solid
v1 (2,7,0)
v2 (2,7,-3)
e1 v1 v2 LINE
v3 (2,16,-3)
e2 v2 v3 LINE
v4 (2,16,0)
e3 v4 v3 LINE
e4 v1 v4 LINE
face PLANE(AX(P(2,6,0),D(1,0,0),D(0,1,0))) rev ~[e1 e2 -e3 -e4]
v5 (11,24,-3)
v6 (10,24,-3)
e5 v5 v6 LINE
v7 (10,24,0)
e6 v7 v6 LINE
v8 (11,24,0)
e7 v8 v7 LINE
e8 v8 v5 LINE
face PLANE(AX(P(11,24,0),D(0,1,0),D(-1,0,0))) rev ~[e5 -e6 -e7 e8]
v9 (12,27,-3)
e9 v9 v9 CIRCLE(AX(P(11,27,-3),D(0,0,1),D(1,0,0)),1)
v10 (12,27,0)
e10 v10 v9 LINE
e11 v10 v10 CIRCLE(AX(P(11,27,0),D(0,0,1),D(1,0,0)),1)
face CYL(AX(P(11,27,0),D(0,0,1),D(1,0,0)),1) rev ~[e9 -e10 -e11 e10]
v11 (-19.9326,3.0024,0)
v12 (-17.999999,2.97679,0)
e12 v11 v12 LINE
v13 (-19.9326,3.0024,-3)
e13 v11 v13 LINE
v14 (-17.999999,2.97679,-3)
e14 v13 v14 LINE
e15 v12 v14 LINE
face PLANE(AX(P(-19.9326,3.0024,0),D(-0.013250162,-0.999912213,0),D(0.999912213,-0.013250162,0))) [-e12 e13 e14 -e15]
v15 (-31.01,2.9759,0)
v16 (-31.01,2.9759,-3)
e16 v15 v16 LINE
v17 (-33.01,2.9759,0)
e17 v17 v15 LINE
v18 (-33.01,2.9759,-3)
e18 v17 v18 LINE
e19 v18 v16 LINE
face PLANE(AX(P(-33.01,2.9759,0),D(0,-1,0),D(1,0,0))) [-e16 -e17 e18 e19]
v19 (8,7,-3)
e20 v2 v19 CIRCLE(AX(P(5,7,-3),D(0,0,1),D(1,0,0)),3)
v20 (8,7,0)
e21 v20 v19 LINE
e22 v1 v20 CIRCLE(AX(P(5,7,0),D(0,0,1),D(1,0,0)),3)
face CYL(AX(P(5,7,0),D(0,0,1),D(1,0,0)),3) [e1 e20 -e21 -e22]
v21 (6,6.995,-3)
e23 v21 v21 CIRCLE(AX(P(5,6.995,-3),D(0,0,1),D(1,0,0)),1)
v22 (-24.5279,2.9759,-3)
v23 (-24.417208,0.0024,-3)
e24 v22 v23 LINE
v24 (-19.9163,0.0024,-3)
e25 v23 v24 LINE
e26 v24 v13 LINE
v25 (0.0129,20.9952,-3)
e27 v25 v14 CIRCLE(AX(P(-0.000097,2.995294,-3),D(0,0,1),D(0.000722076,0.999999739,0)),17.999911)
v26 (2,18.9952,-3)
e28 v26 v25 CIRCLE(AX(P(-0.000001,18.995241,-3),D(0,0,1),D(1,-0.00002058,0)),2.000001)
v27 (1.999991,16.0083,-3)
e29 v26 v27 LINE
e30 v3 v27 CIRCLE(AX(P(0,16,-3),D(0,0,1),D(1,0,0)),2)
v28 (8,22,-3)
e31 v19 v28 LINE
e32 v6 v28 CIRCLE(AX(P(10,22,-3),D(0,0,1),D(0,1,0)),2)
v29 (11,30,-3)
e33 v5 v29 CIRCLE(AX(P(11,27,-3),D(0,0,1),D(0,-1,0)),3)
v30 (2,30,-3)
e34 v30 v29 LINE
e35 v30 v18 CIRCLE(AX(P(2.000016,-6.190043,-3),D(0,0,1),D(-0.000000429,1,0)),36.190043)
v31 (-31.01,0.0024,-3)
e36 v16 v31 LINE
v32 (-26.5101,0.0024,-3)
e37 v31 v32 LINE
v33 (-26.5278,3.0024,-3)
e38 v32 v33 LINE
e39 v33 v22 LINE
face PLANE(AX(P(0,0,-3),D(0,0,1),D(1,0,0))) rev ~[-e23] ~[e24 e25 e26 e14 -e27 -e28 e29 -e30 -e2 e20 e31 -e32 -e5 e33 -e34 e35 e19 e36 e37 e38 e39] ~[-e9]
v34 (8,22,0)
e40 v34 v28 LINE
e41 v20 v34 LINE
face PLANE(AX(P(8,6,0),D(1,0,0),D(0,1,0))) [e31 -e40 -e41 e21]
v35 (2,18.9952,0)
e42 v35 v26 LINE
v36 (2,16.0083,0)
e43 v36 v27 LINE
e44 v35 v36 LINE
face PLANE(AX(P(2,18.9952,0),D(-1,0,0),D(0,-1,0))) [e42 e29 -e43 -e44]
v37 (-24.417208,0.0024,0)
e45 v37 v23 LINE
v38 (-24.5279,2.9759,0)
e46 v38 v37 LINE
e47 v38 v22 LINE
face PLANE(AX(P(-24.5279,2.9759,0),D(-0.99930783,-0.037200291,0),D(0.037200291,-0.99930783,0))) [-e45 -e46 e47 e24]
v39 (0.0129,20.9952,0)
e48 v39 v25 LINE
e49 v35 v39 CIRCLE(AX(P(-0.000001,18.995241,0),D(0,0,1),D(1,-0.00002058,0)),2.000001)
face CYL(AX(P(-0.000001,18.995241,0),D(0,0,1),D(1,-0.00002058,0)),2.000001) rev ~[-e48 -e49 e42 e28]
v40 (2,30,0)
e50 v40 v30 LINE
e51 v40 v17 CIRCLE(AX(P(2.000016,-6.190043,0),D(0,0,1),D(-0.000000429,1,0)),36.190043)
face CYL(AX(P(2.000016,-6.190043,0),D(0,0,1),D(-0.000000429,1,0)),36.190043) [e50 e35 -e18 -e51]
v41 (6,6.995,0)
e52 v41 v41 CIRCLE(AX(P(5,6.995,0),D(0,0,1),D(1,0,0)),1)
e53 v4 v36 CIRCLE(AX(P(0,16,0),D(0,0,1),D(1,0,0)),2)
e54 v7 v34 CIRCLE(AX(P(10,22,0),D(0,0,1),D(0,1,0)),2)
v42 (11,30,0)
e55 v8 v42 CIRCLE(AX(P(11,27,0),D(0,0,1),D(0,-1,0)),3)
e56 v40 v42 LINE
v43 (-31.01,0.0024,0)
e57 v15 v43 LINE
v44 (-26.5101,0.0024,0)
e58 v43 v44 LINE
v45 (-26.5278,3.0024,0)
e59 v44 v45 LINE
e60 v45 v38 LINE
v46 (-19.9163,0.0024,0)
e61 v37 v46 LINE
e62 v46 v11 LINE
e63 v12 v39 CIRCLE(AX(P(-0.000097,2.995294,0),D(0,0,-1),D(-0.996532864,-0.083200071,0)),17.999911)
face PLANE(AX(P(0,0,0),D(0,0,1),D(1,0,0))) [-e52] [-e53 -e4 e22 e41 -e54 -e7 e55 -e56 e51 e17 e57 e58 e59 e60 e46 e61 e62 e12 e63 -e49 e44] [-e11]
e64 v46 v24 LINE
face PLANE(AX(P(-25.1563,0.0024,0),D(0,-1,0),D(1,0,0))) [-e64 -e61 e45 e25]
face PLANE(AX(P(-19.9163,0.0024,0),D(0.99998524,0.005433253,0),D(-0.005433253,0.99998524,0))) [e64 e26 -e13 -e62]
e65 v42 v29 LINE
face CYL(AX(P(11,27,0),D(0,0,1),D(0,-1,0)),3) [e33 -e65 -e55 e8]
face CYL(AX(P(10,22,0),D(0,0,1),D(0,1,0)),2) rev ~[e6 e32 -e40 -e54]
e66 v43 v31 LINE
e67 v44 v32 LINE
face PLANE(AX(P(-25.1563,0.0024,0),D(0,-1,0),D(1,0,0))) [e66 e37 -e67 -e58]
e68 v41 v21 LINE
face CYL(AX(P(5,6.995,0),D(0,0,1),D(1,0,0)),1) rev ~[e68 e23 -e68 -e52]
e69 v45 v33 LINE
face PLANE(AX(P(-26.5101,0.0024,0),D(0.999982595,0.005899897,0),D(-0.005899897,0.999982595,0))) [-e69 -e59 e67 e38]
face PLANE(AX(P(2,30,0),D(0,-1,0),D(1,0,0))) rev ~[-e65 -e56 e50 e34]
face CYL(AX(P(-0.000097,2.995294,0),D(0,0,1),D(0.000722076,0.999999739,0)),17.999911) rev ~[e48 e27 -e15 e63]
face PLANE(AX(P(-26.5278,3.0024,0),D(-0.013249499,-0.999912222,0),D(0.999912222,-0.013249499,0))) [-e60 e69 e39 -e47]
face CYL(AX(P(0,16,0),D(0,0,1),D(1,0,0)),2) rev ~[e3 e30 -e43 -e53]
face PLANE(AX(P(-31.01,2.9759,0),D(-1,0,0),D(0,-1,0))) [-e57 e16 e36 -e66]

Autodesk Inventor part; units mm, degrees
ref_plane "YZ Plane" through (0, 0, 0) normal (1, 0, 0) x (0, 1, 0)
ref_plane "XZ Plane" through (0, 0, 0) normal (0, 1, 0) x (-1, 0, 0)
ref_plane "XY Plane" through (0, 0, 0) normal (0, 0, 1) x (1, 0, 0)
sketch "Sketch1" plane through (0, 0, 0) normal (0, 0, 1) x (1, 0, 0)
  arc A0 (0, 18) -> (-18, 0.0024) centre (0, 0) ccw
  line L0 (0, 0) -> (0, -6.19)
  line L1 (0, -6.19) -> (2, -6.19)
  arc A1 (2, 30) -> (-33.6563, 0.0024) centre (2, -6.19) ccw
  line L2 (-33.6563, 0.0024) -> (-18, 0.0024)
  line L3 (3, 0) -> (3, 0)
  line L4 (6, 0) -> (32.7783, 0) construction
  line L5 (-33.6563, 0.0024) -> (-33.6563, 30.0024)
  line L6 (2, 30) -> (11, 30)
  line L7 (2, 30) -> (11, 30) construction
  line L8 (0, 0) -> (0, 3)
  line L9 (3, 3) -> (3, 3)
  line L10 (0, 3) -> (2, 3)
  line L11 (2, 6) -> (2, 16)
  line L12 (5, 3) -> (5, 3)
  line L13 (8, 6) -> (8, 22)
  arc A2 (2, 6) -> (5, 3) centre (5, 6) ccw
  arc A3 (5, 3) -> (8, 6) centre (5, 6) ccw
  arc A4 (2, 16) -> (0, 18) centre (0, 16) ccw
  arc A5 (11, 24) -> (11, 30) centre (11, 27) ccw
  line L14 (11, 24) -> (10, 24)
  arc A6 (10, 24) -> (8, 22) centre (10, 22) ccw
  circle A7 centre (5, 6) radius 1
  circle A8 centre (11, 27) radius 1
  line L15 (-33.6563, 0.0024) -> (-31.6563, 0.0024)
  line L16 (-27.1563, 0.0024) -> (-25.1563, 0.0024)
  point P0 (8, 3)
  point P1 (8, 24)
  point P2 (2, 17.8885)
  point P3 (-20.6563, 0.0024)
  dimension "d0" = 36
  dimension "d1" = 6.19
  dimension "d2" = 2
  dimension "d3" = 72.38
  dimension "d11" = 30
  dimension "d14" = 3
  dimension "d17" = 2
  dimension "d18" = 6
  dimension "d19" = 3
  dimension "d20" = 2
  dimension "d21" = 9
  dimension "d23" = 6
  dimension "d24" = 18
  dimension "d25" = 2
  dimension "d26" = 2
  dimension "d27" = 2
  dimension "d28" = 2
  dimension "d31" = 2
extrude "Extrusion1" add sketch "Sketch1" against normal blind 3
sketch "Sketch2" plane through (0, 0, 0) normal (0, 0, 1) x (1, 0, 0)
  arc A0 (0.0129, 20.9952) -> (-17.9376, 1.4977) centre (-0.0001, 2.9953) ccw
  arc A1 (2, 18.9952) -> (-0.013, 20.9952) centre (-0.0001, 18.9952) ccw
  line L0 (2, 18.9952) -> (2, 16.0083)
  circle A2 centre (5, 6.9952) radius 3 projected
  circle A3 centre (5, 6.9952) radius 1 projected
  line L1 (8, 6) -> (8, 22) projected
  line L2 (-33, 2.9952) -> (-18, 2.9952) projected
  line L3 (-20, -0.0048) -> (-20, 2.9952) projected
  line L4 (-24.5, -0.0048) -> (-20, -0.0048) projected
  line L5 (-24.5, 2.9952) -> (-24.5, -0.0048) projected
  line L6 (-26.5, -0.0048) -> (-26.5, 2.9952) projected
  line L7 (-31, -0.0048) -> (-26.5, -0.0048) projected
  line L8 (-33.6563, 0.0024) -> (-18, 0.0024) projected
  arc A4 (0, 18) -> (-17.9376, 1.4977) centre (0, 0) ccw
  arc A5 (2, 16) -> (0, 18) centre (0, 16) ccw
  line L9 (2, 16) -> (2, 6) projected
  arc A6 (2, 6) -> (8, 6) centre (5, 6) ccw projected
  line L10 (8, 6) -> (8, 22) projected
  arc A7 (8, 22) -> (10, 24) centre (10, 22) ccw projected
  line L11 (10, 24) -> (11, 24) projected
  arc A8 (11, 24) -> (11, 30) centre (11, 27) ccw projected
  line L12 (11, 30) -> (2, 30) projected
  arc A9 (2, 30) -> (-33.6563, 0.0024) centre (2, -6.19) ccw projected
  circle A10 centre (11, 27) radius 1 projected
  circle A11 centre (5, 6) radius 1 projected
  line L13 (-31, 2.9952) -> (-31, -0.0048) projected
extrude "Extrusion2" cut sketch "Sketch2" against normal blind 9.35 contours A1 L0 A5 A4 A0
sketch "Sketch4" plane through (0, 0, 0) normal (0, 0, 1) x (1, 0, 0)
  circle A0 centre (5, 6) radius 1 projected
  point P0 (0, 0)
extrude "Extrusion3" add sketch "Sketch4" against normal blind 3
sketch "Sketch5" plane through (0, 0, 0) normal (0, 0, 1) x (1, 0, 0)
  line L0 (5, 6) -> (5, 6.995) construction
  circle A0 centre (5, 6.995) radius 1
  point P0 (0, 0)
  dimension "d40" = 0.995
  dimension "d41" = 2
extrude "Extrusion4" cut sketch "Sketch5" against normal blind 3
sketch "Sketch6" plane through (0, 0, 0) normal (0, 0, 1) x (1, 0, 0)
  arc A0 (2, 6) -> (8, 6) centre (5, 6) ccw projected
  line L0 (5, 6) -> (5, 7)
  circle A1 centre (5, 7) radius 3
  line L1 (2, 16) -> (2, 6) projected
  line L2 (8, 6) -> (8, 22) projected
  point P0 (0, 0)
  point P1 (8, 7)
  point P2 (2, 7)
  dimension "d44" = 1
  dimension "d45" = 6
extrude "Extrusion5" cut sketch "Sketch6" against normal blind 3 contours L1 A1 L2 A0
sketch "Sketch8" plane through (0, 0, 0) normal (0, 0, 1) x (1, 0, 0)
  arc A0 (2, 30) -> (-33.6563, 0.0024) centre (2, -6.19) ccw projected
  line L0 (-33.01, 2.9759) -> (-31.01, 2.9759)
  line L1 (-31.01, 2.9759) -> (-31.01, -0.0241)
  line L2 (-31.01, -0.0241) -> (-26.5101, 0.0024)
  line L3 (-18, 0.0024) -> (-33.6563, 0.0024) projected
  line L4 (-26.5101, 0.0024) -> (-26.5278, 3.0024)
  line L5 (-26.5278, 3.0024) -> (-24.5279, 2.9759)
  line L6 (-24.5279, 2.9759) -> (-24.4163, -0.022)
  line L7 (-24.4163, -0.022) -> (-19.9163, 0.0024)
  line L8 (-19.9163, 0.0024) -> (-19.9326, 3.0024)
  line L9 (-19.9326, 3.0024) -> (-17.9328, 2.9759)
  arc A1 (2, 30) -> (-33.6563, 0.0024) centre (2, -6.19) ccw projected
  circle A2 centre (11, 27) radius 1 projected
  arc A3 (2, 7) -> (8, 7) centre (5, 7) ccw projected
  line L10 (8, 7) -> (8, 22) projected
  arc A4 (10, 24) -> (8, 22) centre (10, 22) ccw projected
  line L11 (10, 24) -> (11, 24) projected
  arc A5 (11, 24) -> (11, 30) centre (11, 27) ccw projected
  line L12 (11, 30) -> (2, 30) projected
  arc A6 (2, 30) -> (-33.6563, 0.0024) centre (2, -6.19) ccw projected
  line L13 (-33.6563, 0.0024) -> (-18, 0.0024) projected
  arc A7 (-17.9376, 1.4977) -> (-18, 0.0024) centre (0, 0) ccw projected
  arc A8 (0.0129, 20.9952) -> (-17.9376, 1.4977) centre (-0.0001, 2.9953) ccw projected
  arc A9 (2, 18.9952) -> (0.0129, 20.9952) centre (-0.0001, 18.9952) ccw projected
  line L14 (2, 18.9952) -> (2, 16.0083) projected
  arc A10 (2, 16) -> (2, 16.0083) centre (0, 16) ccw projected
  line L15 (2, 16) -> (2, 7) projected
  circle A11 centre (5, 6.995) radius 1 projected
  point P0 (-18, 2.9768)
  point P1 (-31.01, 0.0024)
  point P2 (-24.4172, 0.0024)
  dimension "d48" = 2
  dimension "d49" = 3
  dimension "d50" = 4.5
  dimension "d51" = 3
  dimension "d52" = 2
  dimension "d53" = 3
  dimension "d54" = 4.5
  dimension "d55" = 3
  dimension "d56" = 2
extrude "Extrusion6" cut sketch "Sketch8" against normal blind 3 contours L0 L1 L3 A0 | L4 L5 L6 L3 | L8 L9 A8 A7 L3
properties part number "hinge"
